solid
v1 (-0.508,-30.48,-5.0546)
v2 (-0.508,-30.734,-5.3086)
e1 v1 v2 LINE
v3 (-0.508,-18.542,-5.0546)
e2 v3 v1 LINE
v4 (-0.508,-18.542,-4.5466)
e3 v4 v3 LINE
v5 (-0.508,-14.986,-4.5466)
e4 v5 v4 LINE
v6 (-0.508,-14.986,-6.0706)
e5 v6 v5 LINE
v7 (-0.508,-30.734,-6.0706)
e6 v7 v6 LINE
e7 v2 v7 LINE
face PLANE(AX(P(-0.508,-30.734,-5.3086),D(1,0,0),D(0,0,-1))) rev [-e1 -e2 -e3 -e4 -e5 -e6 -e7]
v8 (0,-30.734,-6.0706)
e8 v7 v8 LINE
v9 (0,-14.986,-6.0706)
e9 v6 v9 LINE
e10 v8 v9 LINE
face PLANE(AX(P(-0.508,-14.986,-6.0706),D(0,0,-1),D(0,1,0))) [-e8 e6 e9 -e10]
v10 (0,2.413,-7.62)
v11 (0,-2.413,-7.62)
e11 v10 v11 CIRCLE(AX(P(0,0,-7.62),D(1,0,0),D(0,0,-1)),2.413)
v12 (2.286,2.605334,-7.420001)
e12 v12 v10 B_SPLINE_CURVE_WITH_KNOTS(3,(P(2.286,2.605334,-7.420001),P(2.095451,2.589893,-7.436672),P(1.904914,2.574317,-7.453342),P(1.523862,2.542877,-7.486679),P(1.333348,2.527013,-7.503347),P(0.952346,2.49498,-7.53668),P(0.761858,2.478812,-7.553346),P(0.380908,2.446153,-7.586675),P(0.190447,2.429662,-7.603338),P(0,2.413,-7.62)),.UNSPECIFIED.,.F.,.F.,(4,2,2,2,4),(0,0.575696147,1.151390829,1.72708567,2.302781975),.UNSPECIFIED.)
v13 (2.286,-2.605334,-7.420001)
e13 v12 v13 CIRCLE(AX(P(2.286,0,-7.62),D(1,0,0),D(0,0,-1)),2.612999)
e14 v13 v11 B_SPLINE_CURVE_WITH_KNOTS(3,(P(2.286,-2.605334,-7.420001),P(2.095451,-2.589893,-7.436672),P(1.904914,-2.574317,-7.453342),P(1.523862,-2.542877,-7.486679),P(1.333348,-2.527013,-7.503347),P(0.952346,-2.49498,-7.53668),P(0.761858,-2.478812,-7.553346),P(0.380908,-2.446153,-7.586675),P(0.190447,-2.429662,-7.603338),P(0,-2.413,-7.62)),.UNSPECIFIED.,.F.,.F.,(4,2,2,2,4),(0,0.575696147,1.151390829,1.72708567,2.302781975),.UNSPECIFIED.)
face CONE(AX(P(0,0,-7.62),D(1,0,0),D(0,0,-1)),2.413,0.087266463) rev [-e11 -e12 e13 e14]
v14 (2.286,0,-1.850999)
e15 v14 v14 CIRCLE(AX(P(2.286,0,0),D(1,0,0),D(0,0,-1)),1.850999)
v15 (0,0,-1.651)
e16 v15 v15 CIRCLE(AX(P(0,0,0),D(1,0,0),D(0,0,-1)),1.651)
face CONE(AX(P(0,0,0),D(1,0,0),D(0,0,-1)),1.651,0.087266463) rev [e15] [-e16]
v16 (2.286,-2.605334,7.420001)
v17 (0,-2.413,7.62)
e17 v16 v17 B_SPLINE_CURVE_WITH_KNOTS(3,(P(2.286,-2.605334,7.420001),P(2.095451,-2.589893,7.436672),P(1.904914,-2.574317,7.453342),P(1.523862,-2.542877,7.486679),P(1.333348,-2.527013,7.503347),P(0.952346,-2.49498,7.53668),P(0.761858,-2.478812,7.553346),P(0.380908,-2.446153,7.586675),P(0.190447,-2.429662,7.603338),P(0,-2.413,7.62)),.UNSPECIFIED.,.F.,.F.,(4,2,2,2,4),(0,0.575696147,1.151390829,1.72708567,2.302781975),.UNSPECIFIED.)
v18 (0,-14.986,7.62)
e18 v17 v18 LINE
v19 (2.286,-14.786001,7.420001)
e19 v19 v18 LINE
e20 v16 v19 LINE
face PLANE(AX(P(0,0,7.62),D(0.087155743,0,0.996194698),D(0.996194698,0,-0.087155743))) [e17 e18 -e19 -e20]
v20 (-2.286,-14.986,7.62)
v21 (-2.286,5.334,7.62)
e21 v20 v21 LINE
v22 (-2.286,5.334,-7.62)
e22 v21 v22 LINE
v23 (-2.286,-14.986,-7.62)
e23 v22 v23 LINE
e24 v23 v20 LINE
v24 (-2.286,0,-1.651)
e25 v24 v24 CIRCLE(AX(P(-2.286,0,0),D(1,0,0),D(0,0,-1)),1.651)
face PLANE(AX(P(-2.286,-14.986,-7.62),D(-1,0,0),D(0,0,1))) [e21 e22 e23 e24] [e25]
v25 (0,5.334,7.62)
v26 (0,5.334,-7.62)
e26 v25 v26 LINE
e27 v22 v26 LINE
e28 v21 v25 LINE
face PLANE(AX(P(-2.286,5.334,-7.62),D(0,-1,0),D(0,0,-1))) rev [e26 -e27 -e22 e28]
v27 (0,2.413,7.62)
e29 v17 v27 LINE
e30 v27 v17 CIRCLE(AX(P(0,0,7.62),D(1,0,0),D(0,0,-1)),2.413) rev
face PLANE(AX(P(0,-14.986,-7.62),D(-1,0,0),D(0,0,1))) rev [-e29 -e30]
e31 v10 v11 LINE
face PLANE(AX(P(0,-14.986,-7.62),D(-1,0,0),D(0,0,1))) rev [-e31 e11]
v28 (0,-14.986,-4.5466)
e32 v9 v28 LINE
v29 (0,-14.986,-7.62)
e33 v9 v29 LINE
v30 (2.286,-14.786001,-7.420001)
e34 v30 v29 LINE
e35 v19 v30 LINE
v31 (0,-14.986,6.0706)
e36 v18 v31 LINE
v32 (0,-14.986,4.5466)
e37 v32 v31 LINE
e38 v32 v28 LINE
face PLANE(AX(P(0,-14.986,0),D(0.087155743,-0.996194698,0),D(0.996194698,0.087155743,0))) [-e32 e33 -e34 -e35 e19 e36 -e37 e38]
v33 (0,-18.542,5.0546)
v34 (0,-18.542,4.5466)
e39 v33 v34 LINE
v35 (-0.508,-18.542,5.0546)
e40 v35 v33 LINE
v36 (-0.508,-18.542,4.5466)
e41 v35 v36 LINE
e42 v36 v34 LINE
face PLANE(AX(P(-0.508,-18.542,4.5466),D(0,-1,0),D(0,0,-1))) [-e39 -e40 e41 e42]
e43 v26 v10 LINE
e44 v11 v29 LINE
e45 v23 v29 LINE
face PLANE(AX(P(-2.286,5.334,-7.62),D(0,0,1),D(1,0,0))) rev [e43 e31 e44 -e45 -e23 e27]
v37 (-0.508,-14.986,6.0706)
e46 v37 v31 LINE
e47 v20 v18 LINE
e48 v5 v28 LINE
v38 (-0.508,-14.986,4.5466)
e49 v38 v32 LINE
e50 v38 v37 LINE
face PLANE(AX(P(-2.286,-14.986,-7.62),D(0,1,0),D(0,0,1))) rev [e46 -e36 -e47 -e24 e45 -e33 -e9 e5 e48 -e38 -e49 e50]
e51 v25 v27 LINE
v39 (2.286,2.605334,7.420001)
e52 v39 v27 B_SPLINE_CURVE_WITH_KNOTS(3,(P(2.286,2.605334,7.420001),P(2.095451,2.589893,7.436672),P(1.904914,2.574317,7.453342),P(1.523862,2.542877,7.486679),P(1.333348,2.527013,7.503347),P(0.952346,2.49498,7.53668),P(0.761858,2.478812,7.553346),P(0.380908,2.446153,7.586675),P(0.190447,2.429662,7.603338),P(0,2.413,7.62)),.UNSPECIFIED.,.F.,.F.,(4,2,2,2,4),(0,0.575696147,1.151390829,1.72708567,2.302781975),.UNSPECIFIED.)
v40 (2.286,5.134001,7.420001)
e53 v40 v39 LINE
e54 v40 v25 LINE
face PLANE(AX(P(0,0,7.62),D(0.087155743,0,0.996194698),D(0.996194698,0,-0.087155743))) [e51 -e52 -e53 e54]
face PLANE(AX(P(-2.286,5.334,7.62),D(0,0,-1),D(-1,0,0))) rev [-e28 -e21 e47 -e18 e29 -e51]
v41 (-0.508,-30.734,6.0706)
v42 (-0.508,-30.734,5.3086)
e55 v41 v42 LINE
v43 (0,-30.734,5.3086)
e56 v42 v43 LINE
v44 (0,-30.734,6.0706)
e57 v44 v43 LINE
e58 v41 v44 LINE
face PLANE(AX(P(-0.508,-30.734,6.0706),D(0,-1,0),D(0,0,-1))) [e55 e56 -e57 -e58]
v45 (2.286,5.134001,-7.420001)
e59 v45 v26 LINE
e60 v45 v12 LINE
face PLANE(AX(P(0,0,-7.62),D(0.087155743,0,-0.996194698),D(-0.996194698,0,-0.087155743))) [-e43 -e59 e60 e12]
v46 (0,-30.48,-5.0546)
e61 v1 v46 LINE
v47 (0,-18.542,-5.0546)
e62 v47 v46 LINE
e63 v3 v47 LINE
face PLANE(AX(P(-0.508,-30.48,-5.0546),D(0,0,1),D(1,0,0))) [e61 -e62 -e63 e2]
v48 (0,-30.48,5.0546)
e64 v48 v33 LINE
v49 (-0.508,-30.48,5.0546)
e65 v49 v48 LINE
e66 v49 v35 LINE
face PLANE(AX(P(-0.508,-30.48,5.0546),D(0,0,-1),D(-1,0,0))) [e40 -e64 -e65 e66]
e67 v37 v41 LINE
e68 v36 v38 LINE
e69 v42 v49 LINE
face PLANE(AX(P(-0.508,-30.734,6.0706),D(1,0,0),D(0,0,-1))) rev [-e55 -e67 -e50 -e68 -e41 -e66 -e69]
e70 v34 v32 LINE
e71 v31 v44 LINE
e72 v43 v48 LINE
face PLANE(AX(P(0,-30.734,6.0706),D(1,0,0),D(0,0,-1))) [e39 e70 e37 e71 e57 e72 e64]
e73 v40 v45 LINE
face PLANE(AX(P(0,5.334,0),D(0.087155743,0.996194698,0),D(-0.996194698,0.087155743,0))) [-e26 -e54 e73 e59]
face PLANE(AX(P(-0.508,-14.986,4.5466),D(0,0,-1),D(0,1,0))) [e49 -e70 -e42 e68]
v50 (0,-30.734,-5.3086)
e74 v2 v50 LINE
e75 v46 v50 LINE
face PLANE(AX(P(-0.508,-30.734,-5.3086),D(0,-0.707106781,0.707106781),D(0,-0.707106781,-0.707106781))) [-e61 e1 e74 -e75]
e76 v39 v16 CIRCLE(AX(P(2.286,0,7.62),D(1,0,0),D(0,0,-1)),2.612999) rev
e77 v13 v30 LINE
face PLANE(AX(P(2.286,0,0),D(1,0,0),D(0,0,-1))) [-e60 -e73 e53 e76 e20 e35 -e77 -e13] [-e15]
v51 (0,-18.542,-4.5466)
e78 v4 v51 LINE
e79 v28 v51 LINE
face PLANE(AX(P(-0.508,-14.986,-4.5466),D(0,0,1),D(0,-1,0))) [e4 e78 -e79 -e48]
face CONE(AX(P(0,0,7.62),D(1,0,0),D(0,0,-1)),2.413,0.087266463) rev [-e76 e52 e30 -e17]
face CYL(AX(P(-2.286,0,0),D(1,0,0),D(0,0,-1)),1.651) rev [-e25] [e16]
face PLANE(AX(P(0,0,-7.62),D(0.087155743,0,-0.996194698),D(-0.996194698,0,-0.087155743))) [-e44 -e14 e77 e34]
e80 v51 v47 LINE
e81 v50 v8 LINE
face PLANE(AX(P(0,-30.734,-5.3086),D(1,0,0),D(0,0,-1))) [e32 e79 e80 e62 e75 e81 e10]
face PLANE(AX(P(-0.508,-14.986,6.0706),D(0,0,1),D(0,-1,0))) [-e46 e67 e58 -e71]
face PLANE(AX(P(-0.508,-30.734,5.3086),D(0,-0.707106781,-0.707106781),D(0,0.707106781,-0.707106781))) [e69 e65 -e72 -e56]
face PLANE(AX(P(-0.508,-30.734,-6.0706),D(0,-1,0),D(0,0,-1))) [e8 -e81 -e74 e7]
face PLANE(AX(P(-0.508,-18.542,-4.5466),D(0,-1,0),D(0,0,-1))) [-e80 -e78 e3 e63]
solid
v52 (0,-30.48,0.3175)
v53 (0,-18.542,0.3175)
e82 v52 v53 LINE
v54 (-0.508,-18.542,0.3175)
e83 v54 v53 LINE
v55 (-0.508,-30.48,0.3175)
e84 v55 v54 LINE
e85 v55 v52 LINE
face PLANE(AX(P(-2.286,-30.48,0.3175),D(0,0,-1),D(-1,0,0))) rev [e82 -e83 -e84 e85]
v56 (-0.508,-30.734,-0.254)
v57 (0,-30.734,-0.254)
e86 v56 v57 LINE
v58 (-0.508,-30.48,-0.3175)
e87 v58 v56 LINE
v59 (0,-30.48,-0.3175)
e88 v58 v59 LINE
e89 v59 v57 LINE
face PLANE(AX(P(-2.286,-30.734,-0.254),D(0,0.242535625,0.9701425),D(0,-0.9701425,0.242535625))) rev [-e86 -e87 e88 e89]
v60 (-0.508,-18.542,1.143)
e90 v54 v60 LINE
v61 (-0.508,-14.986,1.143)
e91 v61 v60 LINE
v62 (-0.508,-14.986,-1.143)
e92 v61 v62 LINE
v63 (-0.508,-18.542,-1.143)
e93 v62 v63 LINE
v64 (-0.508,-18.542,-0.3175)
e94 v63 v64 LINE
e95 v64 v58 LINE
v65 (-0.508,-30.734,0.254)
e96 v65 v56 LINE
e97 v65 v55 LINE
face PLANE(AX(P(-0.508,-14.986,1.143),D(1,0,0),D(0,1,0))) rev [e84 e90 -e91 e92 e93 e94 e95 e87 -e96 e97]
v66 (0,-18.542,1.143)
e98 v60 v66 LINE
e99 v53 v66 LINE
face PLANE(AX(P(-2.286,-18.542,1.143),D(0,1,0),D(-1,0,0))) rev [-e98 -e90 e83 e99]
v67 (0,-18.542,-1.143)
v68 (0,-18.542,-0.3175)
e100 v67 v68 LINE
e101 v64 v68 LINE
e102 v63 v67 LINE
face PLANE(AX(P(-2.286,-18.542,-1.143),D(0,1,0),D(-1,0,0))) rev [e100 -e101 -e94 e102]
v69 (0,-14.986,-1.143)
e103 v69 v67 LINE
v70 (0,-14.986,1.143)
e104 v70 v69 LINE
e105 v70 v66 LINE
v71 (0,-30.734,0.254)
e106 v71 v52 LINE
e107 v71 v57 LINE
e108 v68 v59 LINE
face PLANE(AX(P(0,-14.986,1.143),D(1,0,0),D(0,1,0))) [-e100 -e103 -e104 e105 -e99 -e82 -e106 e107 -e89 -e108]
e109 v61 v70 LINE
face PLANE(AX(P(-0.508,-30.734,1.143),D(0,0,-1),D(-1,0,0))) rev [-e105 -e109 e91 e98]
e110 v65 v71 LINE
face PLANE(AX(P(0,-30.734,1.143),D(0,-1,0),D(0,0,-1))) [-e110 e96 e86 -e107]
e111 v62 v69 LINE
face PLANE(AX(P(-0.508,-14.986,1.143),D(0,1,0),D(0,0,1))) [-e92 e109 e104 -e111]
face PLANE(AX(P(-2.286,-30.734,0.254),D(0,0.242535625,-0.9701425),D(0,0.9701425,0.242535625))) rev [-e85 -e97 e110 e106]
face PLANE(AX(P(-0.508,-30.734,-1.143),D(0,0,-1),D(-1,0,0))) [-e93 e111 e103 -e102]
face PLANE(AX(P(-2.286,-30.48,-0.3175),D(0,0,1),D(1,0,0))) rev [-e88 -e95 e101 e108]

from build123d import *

# Parameters (mm, degrees)
EXTRUDE1_DEPTH     = 2.286
EXTRUDE1_DRAFT     = 5
SKETCH6_W          = 15.24
SKETCH6_H          = 20.32
EXTRUDE2_DEPTH     = 2.286
SKETCH7_R          = 1.651
CUT_EXTRUDE3_DEPTH = 18.42262265
SKETCH9_R          = 1.651
CUT_EXTRUDE6_DEPTH = 2.286
CUT_EXTRUDE6_DRAFT = -5
SKETCH10_W         = 0.508
SKETCH10_H         = 15.748
BASE_FLANGE1_DEPTH = 1.143
CUT_EXTRUDE8_DEPTH = 32.746951854
EXTRUDE3_DEPTH     = 0.508


# Sheet-metal steps are written as plain solids
with BuildPart() as part:
    # Sketch2 → Extrude1 (with draft: the straight prism first)
    with BuildSketch(Plane(origin=(0, 0, 0), x_dir=(0, 0, -1), z_dir=(1, 0, 0))):
        with BuildLine():
            ThreePointArc((7.62, -2.413), (5.207, 0), (7.62, 2.413))
            Line((7.62, 2.413), (7.62, 5.334))
            Line((7.62, 5.334), (-7.62, 5.334))
            Line((-7.62, 5.334), (-7.62, 2.413))
            ThreePointArc((-7.62, 2.413), (-5.207, 0), (-7.62, -2.413))
            Line((-7.62, -2.413), (-7.62, -14.986))
            Line((-7.62, -14.986), (7.62, -14.986))
            Line((7.62, -14.986), (7.62, -2.413))
        make_face()
    extrude(amount=EXTRUDE1_DEPTH)
    # Extrude1: the draft: its side faces are tilted about the plane it starts from
    extrude1_sides = [part.faces().sort_by_distance(p)[0] for p in [
        (1.143, 0, -5.207),
        (1.143, 3.8735, -7.62),
        (1.143, 5.334, 0),
        (1.143, 3.8735, 7.62),
        (1.143, 0, 5.207),
        (1.143, -8.6995, 7.62),
        (1.143, -14.986, 0),
        (1.143, -8.6995, -7.62),
    ]]
    draft(extrude1_sides, Plane(origin=(0, 0, 0), x_dir=(0, 0, -1), z_dir=(1, 0, 0)), EXTRUDE1_DRAFT)

    # Sketch6 → Extrude2 (add)
    with BuildSketch(Plane.ZY):
        with Locations((0, -4.826)):
            Rectangle(SKETCH6_W, SKETCH6_H)
    extrude(amount=EXTRUDE2_DEPTH)

    # Sketch7 → Cut-Extrude3 (cut, through all)
    with BuildSketch(Plane(origin=(2.286, 0, 0), x_dir=(0, 0, -1), z_dir=(1, 0, 0))):
        Circle(SKETCH7_R)
    extrude(amount=-CUT_EXTRUDE3_DEPTH, mode=Mode.SUBTRACT)


with BuildPart() as cut_extrude6_tool:
    # Sketch9 → Cut-Extrude6 (with draft: the straight prism first)
    with BuildSketch(Plane(origin=(0, 0, 0), x_dir=(0, 0, -1), z_dir=(1, 0, 0))):
        Circle(SKETCH9_R)
    extrude(amount=CUT_EXTRUDE6_DEPTH)
    # Cut-Extrude6: the draft: its side faces are tilted about the plane it starts from
    cut_extrude6_sides = [cut_extrude6_tool.faces().sort_by_distance(p)[0] for p in [
        (1.143, 0, 1.651),
    ]]
    draft(cut_extrude6_sides, Plane(origin=(0, 0, 0), x_dir=(0, 0, -1), z_dir=(1, 0, 0)), CUT_EXTRUDE6_DRAFT)


with BuildPart() as part_1:
    add(part.part)

    # Cut-Extrude6: cut by cut_extrude6_tool
    add(cut_extrude6_tool.part, mode=Mode.SUBTRACT)

    # Sketch15 → Extrude3 (add)
    with BuildSketch(Plane(origin=(0, 0, 0), x_dir=(0, 0, -1), z_dir=(1, 0, 0))):
        Polygon((-6.0706, -14.986), (-4.5466, -14.986), (-4.5466, -18.542), (-5.0546, -18.542), (-5.0546, -30.48), (-5.3086, -30.734), (-6.0706, -30.734), align=None)
        Polygon((5.0546, -30.48), (5.0546, -18.542), (4.5466, -18.542), (4.5466, -14.986), (6.0706, -14.986), (6.0706, -30.734), (5.3086, -30.734), align=None)
    extrude(amount=-EXTRUDE3_DEPTH)


with BuildPart() as body_2:
    # Sketch10 → Base-Flange1 (new, symmetric)
    with BuildSketch(Plane.XY):
        with Locations((-0.254, -22.86)):
            Rectangle(SKETCH10_W, SKETCH10_H)
    extrude(amount=BASE_FLANGE1_DEPTH, both=True)

    # Sketch13 → Cut-Extrude8 (cut, through all)
    with BuildSketch(Plane(origin=(0, 0, 0), x_dir=(0, 0, -1), z_dir=(1, 0, 0))):
        Polygon((-1.143, -30.734), (-0.254, -30.734), (-0.3175, -30.48), (-0.3175, -18.542), (-1.143, -18.542), align=None)
        Polygon((0.254, -30.734), (0.3175, -30.48), (0.3175, -18.542), (1.143, -18.542), (1.143, -30.734), align=None)
    extrude(amount=-CUT_EXTRUDE8_DEPTH, mode=Mode.SUBTRACT)


solid = Compound([part_1.part, body_2.part])
